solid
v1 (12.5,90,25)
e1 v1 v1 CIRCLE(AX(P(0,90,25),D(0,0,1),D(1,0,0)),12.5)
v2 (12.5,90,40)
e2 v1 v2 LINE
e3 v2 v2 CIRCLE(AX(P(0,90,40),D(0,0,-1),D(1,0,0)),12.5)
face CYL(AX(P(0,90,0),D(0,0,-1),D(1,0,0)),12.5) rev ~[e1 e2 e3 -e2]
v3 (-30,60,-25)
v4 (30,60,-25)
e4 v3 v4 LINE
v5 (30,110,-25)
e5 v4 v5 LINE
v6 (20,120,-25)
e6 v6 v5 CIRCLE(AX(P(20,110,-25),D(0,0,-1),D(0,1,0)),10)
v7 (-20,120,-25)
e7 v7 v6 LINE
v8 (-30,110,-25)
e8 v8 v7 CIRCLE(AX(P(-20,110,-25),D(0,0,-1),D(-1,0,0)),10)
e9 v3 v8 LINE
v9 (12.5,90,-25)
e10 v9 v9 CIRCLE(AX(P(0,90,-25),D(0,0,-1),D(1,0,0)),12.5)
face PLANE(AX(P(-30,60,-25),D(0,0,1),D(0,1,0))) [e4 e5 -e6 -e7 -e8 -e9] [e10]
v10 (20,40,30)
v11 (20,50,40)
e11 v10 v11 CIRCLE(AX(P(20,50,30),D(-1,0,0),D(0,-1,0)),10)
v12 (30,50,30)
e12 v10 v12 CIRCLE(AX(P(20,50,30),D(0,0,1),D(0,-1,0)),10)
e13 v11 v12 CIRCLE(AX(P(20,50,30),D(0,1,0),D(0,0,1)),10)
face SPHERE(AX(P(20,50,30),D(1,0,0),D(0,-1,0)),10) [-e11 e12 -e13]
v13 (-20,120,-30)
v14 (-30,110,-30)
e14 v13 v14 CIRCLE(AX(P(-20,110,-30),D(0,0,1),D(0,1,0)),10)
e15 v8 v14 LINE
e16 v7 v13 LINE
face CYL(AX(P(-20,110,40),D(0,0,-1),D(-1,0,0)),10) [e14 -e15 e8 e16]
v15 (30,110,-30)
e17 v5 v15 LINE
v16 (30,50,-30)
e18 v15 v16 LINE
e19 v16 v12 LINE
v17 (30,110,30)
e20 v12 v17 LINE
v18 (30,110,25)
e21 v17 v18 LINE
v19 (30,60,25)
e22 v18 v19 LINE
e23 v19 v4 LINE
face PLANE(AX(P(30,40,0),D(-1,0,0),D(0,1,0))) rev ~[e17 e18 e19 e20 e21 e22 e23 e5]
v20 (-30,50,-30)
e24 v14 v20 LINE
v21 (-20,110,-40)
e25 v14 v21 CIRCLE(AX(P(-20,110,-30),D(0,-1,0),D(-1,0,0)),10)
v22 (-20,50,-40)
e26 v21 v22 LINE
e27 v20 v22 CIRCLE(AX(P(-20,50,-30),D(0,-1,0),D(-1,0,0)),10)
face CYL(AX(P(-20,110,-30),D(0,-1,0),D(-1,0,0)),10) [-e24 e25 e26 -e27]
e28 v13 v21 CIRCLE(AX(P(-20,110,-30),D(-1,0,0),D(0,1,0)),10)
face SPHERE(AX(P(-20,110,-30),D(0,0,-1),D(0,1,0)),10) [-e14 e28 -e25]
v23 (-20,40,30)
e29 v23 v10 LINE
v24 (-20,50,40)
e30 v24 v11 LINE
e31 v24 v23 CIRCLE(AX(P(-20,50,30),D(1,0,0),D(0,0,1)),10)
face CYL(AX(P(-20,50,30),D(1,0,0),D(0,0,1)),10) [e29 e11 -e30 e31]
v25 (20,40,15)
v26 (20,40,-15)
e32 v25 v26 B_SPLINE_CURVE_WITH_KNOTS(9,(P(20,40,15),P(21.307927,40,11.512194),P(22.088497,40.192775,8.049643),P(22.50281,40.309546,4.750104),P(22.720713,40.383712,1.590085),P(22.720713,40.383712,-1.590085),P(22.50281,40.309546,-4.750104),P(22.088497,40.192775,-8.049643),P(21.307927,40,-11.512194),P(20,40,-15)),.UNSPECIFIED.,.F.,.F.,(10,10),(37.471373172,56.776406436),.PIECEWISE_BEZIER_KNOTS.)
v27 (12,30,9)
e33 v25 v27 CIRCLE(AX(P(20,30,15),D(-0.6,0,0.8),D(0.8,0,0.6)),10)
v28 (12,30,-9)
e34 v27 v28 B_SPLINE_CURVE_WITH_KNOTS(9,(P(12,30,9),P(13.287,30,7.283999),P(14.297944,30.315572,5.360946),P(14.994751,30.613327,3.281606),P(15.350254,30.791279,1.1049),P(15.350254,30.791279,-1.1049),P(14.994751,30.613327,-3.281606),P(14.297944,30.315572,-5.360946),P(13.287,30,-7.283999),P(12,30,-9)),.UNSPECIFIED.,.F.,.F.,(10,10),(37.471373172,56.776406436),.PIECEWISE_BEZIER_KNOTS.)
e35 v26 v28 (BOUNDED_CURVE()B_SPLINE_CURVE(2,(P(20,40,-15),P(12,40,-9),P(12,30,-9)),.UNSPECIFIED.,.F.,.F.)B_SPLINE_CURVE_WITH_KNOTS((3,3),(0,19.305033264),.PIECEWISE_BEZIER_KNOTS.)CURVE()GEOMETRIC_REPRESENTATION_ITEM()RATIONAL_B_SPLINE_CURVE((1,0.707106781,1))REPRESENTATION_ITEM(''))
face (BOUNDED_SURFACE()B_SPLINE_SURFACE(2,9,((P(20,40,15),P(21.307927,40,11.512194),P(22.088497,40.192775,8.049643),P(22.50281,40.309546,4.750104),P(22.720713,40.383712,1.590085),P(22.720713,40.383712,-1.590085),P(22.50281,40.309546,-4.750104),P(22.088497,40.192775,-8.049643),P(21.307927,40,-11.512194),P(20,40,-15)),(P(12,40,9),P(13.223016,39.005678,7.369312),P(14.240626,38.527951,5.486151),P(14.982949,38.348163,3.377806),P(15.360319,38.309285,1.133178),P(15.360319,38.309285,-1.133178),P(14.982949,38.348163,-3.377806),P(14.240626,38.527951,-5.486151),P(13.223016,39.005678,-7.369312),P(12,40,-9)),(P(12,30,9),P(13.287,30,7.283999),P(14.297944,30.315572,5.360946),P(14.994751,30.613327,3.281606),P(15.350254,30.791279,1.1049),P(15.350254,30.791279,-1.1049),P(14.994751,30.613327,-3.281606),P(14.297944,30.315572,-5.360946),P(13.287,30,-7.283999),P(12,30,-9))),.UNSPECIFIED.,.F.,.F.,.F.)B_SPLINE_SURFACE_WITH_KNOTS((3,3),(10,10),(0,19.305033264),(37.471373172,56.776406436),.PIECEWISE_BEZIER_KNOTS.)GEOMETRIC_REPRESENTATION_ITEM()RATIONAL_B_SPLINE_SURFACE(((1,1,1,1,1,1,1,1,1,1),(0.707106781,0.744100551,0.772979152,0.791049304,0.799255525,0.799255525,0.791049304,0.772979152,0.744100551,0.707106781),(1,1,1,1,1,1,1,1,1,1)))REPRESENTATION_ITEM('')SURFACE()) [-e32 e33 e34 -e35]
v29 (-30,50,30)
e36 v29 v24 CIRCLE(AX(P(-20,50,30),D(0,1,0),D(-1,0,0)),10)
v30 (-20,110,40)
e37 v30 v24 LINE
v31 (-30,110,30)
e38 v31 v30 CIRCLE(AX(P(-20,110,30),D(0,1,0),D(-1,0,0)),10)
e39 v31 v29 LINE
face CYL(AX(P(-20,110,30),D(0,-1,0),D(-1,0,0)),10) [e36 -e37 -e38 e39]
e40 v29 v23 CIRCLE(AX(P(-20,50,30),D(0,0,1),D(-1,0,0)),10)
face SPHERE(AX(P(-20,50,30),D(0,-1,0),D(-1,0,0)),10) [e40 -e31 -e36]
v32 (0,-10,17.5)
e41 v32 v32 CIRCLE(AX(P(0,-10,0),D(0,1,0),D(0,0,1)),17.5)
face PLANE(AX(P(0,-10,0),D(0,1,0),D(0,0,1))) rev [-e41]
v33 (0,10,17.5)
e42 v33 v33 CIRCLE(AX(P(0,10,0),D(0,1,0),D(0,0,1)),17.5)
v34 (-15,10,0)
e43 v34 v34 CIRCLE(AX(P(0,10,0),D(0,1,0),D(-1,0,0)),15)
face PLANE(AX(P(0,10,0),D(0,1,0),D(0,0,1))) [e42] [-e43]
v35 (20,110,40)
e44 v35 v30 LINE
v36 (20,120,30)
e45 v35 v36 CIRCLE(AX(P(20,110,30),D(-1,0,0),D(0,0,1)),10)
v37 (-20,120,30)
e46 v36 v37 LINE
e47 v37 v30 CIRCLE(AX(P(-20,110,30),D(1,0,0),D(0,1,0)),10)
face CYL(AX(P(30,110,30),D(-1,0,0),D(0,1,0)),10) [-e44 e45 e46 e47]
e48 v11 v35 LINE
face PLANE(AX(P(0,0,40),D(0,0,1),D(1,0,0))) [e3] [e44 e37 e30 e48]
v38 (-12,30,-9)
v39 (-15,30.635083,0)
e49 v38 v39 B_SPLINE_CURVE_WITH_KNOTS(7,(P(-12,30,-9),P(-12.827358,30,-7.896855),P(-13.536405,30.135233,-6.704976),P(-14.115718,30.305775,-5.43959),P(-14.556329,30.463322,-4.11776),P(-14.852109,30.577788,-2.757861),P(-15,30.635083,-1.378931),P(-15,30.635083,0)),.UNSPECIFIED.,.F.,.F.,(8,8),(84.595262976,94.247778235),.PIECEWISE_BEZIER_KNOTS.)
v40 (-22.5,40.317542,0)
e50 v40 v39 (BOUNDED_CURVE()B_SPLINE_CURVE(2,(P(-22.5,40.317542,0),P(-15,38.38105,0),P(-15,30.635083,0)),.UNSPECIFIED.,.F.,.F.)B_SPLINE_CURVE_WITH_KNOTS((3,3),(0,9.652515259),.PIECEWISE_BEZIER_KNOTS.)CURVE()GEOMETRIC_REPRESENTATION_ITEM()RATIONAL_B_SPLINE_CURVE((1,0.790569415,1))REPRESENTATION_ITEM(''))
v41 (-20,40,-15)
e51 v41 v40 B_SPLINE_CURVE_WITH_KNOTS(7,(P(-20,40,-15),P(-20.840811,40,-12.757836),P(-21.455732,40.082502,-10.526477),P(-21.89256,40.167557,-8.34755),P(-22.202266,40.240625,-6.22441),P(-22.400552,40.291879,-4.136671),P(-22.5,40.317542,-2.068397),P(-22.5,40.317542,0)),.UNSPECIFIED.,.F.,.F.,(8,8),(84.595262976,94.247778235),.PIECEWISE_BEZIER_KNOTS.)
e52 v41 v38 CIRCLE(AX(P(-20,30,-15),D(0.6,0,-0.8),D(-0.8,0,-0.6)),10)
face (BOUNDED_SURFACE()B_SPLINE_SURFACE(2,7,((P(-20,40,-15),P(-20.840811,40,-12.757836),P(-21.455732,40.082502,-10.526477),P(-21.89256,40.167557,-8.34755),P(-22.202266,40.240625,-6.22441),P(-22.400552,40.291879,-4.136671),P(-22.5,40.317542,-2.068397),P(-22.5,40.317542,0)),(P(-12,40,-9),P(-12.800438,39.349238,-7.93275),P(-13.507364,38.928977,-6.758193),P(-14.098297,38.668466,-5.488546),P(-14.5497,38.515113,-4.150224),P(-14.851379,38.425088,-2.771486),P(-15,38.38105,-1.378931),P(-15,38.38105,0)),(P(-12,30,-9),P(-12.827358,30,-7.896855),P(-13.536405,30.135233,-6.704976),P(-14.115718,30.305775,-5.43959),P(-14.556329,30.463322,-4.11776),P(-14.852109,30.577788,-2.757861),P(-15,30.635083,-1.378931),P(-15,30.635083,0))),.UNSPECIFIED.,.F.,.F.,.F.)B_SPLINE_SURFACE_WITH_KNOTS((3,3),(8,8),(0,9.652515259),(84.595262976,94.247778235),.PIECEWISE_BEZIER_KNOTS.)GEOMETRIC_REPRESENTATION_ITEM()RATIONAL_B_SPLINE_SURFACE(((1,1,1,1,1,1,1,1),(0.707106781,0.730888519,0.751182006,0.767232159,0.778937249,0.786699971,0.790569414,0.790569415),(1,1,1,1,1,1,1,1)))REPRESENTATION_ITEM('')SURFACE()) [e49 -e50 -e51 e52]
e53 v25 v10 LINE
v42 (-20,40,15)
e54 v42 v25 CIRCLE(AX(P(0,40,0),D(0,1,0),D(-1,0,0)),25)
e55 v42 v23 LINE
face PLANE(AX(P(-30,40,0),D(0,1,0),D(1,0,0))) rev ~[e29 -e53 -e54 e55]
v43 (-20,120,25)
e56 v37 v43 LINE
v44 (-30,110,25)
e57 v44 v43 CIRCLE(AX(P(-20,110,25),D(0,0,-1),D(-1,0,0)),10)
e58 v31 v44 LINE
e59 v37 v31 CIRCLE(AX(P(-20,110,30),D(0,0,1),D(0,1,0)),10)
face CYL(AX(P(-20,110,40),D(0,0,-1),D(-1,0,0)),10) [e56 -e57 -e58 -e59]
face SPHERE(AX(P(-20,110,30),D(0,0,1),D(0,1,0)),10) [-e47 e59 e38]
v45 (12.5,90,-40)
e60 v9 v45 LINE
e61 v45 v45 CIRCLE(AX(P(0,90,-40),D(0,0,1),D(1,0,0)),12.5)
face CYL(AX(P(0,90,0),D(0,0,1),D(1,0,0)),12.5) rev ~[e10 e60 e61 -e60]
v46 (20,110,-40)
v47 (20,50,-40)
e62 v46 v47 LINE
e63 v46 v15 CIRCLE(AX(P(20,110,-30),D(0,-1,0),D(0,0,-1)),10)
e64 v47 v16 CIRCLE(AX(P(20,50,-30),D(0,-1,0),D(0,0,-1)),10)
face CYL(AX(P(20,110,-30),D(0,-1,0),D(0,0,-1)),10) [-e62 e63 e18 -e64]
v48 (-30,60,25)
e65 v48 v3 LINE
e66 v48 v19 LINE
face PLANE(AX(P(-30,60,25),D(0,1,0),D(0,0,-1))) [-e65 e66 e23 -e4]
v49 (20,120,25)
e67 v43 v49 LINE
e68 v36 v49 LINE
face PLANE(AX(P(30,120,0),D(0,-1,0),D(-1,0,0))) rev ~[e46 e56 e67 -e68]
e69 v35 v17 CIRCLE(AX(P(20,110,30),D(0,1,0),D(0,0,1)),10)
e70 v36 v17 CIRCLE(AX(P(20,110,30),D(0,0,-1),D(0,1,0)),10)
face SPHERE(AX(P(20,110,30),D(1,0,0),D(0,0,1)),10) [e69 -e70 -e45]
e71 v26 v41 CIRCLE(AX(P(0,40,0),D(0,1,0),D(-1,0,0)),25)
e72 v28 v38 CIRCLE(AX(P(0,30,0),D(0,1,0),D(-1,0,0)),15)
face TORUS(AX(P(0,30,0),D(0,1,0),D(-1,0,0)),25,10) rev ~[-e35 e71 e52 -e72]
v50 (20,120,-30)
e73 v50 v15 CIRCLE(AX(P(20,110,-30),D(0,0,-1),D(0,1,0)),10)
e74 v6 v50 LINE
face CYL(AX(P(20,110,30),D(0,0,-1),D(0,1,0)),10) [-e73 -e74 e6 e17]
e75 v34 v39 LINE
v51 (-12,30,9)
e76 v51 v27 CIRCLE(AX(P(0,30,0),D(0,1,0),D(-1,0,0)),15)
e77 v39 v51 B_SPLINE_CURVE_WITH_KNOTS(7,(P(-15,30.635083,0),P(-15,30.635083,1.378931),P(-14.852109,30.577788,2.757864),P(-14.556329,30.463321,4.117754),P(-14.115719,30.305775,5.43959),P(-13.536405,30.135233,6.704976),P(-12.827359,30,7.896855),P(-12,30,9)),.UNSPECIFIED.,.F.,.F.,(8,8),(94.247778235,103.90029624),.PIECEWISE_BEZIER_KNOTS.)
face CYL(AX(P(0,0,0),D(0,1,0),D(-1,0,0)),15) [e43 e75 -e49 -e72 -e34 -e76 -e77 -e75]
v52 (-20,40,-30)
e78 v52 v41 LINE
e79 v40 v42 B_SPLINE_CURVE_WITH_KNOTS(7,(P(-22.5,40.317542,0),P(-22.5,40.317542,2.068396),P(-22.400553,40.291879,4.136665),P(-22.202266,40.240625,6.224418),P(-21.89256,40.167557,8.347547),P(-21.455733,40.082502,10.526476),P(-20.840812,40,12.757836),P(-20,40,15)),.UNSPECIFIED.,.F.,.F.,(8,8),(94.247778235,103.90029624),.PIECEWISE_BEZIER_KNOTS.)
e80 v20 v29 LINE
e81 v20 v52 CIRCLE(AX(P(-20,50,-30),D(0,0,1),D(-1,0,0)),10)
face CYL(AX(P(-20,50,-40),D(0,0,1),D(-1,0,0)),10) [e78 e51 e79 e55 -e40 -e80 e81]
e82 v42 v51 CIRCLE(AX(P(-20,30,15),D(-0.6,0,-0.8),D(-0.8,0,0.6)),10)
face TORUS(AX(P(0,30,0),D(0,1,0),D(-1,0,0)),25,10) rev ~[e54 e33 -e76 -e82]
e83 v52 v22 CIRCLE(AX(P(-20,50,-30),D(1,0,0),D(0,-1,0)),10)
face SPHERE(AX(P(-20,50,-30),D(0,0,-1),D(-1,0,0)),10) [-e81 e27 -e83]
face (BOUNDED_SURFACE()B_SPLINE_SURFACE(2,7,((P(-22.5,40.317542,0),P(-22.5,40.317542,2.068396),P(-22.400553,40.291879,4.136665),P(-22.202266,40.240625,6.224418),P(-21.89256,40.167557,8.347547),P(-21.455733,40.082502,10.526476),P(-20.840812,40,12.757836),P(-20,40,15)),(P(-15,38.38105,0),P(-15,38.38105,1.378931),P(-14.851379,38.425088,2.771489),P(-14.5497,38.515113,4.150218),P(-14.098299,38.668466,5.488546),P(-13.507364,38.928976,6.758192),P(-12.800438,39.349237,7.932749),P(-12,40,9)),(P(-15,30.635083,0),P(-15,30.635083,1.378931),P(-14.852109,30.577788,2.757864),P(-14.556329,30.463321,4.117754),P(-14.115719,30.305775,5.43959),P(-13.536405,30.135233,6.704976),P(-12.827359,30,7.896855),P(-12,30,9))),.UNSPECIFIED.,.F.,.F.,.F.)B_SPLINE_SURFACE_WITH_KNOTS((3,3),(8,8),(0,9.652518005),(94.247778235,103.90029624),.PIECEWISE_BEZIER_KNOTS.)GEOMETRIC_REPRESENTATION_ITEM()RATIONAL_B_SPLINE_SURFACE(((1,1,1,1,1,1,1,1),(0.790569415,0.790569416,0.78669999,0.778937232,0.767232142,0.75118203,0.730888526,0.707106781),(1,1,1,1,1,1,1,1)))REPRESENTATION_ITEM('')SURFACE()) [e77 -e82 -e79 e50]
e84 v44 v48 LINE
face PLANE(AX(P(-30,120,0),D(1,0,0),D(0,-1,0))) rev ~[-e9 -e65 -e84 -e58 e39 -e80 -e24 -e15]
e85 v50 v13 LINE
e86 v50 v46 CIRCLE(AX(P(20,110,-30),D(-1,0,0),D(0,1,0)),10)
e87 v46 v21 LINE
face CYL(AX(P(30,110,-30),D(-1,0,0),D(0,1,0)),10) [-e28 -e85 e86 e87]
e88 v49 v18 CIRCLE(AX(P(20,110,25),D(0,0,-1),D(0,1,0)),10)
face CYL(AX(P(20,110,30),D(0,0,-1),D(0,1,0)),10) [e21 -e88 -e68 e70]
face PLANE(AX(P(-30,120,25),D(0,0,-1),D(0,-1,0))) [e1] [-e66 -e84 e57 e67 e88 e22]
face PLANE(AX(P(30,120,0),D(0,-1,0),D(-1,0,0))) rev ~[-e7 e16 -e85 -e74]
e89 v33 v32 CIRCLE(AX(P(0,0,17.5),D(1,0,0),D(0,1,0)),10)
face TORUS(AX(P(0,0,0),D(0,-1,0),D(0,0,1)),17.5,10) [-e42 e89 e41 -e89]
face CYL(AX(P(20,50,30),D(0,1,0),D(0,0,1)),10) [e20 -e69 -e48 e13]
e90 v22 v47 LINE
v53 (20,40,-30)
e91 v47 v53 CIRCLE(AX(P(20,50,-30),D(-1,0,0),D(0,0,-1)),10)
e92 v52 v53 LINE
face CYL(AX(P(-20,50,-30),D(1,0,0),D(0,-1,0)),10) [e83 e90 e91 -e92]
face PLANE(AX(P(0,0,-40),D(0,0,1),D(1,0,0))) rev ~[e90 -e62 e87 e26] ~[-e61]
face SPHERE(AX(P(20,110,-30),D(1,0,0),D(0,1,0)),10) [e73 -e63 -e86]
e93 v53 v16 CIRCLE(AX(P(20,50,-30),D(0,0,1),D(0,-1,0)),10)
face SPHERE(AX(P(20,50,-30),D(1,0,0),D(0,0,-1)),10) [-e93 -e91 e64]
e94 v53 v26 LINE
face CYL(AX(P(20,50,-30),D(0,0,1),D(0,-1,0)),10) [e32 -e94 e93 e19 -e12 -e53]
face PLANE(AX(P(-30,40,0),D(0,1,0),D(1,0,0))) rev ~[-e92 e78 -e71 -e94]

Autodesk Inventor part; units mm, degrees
ref_plane "YZ Plane" through (0, 0, 0) normal (1, 0, 0) x (0, 1, 0)
ref_plane "XZ Plane" through (0, 0, 0) normal (0, 1, 0) x (-1, 0, 0)
ref_plane "XY Plane" through (0, 0, 0) normal (0, 0, 1) x (1, 0, 0)
sketch "Sketch1" plane through (0, 0, 0) normal (0, 0, 1) x (1, 0, 0)
  line L0 (0, 0) -> (0, 40)
  dimension "d0" = 40
sketch "Sketch2" plane through (0, 0, 0) normal (0, 1, 0) x (-1, 0, 0)
  circle A0 centre (0, 0) radius 15
  dimension "d3" = 30
sweep "Sweep1" add profiles "Sketch2" path "Sketch1"
sketch "Sketch4" plane through (0, 0, 0) normal (1, 0, 0) x (0, 1, 0)
  line L0 (0, 17.5) -> (0, -17.5) construction
  line L1 (10, 17.5) -> (10, -17.5)
  line L2 (-10, -17.5) -> (-10, 17.5)
  arc A0 (10, 17.5) -> (-10, 17.5) centre (0, 17.5) ccw
  arc A1 (-10, -17.5) -> (10, -17.5) centre (0, -17.5) ccw
  line L3 (-10, 0) -> (10, 0)
  point P0 (0, 0)
  dimension "d9" = 35
  dimension "d10" = 10
revolve "Revolution1" add sketch "Sketch4" angle 360 about axis through (0, -10, 0) along (0, 1, 0) contours L1 L3 L2 A0
sketch "Sketch5" plane through (0, 0, 0) normal (0, 0, 1) x (1, 0, 0)
  line L0 (-30, 40) -> (30, 40)
  line L1 (30, 40) -> (30, 120)
  line L2 (30, 120) -> (-30, 120)
  line L3 (-30, 120) -> (-30, 40)
  circle A0 centre (0, 90) radius 12.5
  line L4 (0, 0) -> (0, 40) construction
  line L5 (0, 90) -> (0, 40)
  dimension "d12" = 90
  dimension "d13" = 25
  dimension "d14" = 60
  dimension "d15" = 30
extrude "Extrusion1" add sketch "Sketch5" along normal mid plane 80
sketch "Sketch7" plane through (-30, 40, 40) normal (-1, 0, 0) x (0, 0, 1)
  line L0 (-80, 80) -> (0, 80) construction
  line L1 (-65, 80) -> (-15, 80)
  line L2 (-15, 80) -> (-15, 20)
  line L3 (-15, 20) -> (-65, 20)
  line L4 (-65, 20) -> (-65, 80)
  line L5 (-80, 37.5) -> (-80, 62.5) construction
  line L6 (0, 62.5) -> (0, 37.5) construction
  line L7 (-80, 0) -> (-80, 80) construction
  line L8 (-80, 50) -> (0, 50) construction
  line L9 (0, 80) -> (0, 0) construction
  line L10 (-40, 50) -> (-40, 0) construction
  point P0 (-40, -40)
  dimension "d18" = 30
  dimension "d19" = 50
  dimension "d20" = 25
  dimension "d21" = 90
fillet "Fillet1" radius 10 13 edges at (-30, 80, 40) (30, 80, 40) (-30, 80, -40) (30, 80, -40) (-30, 40, 0) (0, 40, -40) (0, 40, 40) (30, 40, 0) (15, 40, 0) (-30, 120, 0) (0, 120, 40) (30, 120, 0) (0, 120, -40)
extrude "Extrusion2" cut sketch "Sketch7" against normal through all
equation "\"d20\" = 0.5 * d19"
properties part number "Elo-Bola Longo"
